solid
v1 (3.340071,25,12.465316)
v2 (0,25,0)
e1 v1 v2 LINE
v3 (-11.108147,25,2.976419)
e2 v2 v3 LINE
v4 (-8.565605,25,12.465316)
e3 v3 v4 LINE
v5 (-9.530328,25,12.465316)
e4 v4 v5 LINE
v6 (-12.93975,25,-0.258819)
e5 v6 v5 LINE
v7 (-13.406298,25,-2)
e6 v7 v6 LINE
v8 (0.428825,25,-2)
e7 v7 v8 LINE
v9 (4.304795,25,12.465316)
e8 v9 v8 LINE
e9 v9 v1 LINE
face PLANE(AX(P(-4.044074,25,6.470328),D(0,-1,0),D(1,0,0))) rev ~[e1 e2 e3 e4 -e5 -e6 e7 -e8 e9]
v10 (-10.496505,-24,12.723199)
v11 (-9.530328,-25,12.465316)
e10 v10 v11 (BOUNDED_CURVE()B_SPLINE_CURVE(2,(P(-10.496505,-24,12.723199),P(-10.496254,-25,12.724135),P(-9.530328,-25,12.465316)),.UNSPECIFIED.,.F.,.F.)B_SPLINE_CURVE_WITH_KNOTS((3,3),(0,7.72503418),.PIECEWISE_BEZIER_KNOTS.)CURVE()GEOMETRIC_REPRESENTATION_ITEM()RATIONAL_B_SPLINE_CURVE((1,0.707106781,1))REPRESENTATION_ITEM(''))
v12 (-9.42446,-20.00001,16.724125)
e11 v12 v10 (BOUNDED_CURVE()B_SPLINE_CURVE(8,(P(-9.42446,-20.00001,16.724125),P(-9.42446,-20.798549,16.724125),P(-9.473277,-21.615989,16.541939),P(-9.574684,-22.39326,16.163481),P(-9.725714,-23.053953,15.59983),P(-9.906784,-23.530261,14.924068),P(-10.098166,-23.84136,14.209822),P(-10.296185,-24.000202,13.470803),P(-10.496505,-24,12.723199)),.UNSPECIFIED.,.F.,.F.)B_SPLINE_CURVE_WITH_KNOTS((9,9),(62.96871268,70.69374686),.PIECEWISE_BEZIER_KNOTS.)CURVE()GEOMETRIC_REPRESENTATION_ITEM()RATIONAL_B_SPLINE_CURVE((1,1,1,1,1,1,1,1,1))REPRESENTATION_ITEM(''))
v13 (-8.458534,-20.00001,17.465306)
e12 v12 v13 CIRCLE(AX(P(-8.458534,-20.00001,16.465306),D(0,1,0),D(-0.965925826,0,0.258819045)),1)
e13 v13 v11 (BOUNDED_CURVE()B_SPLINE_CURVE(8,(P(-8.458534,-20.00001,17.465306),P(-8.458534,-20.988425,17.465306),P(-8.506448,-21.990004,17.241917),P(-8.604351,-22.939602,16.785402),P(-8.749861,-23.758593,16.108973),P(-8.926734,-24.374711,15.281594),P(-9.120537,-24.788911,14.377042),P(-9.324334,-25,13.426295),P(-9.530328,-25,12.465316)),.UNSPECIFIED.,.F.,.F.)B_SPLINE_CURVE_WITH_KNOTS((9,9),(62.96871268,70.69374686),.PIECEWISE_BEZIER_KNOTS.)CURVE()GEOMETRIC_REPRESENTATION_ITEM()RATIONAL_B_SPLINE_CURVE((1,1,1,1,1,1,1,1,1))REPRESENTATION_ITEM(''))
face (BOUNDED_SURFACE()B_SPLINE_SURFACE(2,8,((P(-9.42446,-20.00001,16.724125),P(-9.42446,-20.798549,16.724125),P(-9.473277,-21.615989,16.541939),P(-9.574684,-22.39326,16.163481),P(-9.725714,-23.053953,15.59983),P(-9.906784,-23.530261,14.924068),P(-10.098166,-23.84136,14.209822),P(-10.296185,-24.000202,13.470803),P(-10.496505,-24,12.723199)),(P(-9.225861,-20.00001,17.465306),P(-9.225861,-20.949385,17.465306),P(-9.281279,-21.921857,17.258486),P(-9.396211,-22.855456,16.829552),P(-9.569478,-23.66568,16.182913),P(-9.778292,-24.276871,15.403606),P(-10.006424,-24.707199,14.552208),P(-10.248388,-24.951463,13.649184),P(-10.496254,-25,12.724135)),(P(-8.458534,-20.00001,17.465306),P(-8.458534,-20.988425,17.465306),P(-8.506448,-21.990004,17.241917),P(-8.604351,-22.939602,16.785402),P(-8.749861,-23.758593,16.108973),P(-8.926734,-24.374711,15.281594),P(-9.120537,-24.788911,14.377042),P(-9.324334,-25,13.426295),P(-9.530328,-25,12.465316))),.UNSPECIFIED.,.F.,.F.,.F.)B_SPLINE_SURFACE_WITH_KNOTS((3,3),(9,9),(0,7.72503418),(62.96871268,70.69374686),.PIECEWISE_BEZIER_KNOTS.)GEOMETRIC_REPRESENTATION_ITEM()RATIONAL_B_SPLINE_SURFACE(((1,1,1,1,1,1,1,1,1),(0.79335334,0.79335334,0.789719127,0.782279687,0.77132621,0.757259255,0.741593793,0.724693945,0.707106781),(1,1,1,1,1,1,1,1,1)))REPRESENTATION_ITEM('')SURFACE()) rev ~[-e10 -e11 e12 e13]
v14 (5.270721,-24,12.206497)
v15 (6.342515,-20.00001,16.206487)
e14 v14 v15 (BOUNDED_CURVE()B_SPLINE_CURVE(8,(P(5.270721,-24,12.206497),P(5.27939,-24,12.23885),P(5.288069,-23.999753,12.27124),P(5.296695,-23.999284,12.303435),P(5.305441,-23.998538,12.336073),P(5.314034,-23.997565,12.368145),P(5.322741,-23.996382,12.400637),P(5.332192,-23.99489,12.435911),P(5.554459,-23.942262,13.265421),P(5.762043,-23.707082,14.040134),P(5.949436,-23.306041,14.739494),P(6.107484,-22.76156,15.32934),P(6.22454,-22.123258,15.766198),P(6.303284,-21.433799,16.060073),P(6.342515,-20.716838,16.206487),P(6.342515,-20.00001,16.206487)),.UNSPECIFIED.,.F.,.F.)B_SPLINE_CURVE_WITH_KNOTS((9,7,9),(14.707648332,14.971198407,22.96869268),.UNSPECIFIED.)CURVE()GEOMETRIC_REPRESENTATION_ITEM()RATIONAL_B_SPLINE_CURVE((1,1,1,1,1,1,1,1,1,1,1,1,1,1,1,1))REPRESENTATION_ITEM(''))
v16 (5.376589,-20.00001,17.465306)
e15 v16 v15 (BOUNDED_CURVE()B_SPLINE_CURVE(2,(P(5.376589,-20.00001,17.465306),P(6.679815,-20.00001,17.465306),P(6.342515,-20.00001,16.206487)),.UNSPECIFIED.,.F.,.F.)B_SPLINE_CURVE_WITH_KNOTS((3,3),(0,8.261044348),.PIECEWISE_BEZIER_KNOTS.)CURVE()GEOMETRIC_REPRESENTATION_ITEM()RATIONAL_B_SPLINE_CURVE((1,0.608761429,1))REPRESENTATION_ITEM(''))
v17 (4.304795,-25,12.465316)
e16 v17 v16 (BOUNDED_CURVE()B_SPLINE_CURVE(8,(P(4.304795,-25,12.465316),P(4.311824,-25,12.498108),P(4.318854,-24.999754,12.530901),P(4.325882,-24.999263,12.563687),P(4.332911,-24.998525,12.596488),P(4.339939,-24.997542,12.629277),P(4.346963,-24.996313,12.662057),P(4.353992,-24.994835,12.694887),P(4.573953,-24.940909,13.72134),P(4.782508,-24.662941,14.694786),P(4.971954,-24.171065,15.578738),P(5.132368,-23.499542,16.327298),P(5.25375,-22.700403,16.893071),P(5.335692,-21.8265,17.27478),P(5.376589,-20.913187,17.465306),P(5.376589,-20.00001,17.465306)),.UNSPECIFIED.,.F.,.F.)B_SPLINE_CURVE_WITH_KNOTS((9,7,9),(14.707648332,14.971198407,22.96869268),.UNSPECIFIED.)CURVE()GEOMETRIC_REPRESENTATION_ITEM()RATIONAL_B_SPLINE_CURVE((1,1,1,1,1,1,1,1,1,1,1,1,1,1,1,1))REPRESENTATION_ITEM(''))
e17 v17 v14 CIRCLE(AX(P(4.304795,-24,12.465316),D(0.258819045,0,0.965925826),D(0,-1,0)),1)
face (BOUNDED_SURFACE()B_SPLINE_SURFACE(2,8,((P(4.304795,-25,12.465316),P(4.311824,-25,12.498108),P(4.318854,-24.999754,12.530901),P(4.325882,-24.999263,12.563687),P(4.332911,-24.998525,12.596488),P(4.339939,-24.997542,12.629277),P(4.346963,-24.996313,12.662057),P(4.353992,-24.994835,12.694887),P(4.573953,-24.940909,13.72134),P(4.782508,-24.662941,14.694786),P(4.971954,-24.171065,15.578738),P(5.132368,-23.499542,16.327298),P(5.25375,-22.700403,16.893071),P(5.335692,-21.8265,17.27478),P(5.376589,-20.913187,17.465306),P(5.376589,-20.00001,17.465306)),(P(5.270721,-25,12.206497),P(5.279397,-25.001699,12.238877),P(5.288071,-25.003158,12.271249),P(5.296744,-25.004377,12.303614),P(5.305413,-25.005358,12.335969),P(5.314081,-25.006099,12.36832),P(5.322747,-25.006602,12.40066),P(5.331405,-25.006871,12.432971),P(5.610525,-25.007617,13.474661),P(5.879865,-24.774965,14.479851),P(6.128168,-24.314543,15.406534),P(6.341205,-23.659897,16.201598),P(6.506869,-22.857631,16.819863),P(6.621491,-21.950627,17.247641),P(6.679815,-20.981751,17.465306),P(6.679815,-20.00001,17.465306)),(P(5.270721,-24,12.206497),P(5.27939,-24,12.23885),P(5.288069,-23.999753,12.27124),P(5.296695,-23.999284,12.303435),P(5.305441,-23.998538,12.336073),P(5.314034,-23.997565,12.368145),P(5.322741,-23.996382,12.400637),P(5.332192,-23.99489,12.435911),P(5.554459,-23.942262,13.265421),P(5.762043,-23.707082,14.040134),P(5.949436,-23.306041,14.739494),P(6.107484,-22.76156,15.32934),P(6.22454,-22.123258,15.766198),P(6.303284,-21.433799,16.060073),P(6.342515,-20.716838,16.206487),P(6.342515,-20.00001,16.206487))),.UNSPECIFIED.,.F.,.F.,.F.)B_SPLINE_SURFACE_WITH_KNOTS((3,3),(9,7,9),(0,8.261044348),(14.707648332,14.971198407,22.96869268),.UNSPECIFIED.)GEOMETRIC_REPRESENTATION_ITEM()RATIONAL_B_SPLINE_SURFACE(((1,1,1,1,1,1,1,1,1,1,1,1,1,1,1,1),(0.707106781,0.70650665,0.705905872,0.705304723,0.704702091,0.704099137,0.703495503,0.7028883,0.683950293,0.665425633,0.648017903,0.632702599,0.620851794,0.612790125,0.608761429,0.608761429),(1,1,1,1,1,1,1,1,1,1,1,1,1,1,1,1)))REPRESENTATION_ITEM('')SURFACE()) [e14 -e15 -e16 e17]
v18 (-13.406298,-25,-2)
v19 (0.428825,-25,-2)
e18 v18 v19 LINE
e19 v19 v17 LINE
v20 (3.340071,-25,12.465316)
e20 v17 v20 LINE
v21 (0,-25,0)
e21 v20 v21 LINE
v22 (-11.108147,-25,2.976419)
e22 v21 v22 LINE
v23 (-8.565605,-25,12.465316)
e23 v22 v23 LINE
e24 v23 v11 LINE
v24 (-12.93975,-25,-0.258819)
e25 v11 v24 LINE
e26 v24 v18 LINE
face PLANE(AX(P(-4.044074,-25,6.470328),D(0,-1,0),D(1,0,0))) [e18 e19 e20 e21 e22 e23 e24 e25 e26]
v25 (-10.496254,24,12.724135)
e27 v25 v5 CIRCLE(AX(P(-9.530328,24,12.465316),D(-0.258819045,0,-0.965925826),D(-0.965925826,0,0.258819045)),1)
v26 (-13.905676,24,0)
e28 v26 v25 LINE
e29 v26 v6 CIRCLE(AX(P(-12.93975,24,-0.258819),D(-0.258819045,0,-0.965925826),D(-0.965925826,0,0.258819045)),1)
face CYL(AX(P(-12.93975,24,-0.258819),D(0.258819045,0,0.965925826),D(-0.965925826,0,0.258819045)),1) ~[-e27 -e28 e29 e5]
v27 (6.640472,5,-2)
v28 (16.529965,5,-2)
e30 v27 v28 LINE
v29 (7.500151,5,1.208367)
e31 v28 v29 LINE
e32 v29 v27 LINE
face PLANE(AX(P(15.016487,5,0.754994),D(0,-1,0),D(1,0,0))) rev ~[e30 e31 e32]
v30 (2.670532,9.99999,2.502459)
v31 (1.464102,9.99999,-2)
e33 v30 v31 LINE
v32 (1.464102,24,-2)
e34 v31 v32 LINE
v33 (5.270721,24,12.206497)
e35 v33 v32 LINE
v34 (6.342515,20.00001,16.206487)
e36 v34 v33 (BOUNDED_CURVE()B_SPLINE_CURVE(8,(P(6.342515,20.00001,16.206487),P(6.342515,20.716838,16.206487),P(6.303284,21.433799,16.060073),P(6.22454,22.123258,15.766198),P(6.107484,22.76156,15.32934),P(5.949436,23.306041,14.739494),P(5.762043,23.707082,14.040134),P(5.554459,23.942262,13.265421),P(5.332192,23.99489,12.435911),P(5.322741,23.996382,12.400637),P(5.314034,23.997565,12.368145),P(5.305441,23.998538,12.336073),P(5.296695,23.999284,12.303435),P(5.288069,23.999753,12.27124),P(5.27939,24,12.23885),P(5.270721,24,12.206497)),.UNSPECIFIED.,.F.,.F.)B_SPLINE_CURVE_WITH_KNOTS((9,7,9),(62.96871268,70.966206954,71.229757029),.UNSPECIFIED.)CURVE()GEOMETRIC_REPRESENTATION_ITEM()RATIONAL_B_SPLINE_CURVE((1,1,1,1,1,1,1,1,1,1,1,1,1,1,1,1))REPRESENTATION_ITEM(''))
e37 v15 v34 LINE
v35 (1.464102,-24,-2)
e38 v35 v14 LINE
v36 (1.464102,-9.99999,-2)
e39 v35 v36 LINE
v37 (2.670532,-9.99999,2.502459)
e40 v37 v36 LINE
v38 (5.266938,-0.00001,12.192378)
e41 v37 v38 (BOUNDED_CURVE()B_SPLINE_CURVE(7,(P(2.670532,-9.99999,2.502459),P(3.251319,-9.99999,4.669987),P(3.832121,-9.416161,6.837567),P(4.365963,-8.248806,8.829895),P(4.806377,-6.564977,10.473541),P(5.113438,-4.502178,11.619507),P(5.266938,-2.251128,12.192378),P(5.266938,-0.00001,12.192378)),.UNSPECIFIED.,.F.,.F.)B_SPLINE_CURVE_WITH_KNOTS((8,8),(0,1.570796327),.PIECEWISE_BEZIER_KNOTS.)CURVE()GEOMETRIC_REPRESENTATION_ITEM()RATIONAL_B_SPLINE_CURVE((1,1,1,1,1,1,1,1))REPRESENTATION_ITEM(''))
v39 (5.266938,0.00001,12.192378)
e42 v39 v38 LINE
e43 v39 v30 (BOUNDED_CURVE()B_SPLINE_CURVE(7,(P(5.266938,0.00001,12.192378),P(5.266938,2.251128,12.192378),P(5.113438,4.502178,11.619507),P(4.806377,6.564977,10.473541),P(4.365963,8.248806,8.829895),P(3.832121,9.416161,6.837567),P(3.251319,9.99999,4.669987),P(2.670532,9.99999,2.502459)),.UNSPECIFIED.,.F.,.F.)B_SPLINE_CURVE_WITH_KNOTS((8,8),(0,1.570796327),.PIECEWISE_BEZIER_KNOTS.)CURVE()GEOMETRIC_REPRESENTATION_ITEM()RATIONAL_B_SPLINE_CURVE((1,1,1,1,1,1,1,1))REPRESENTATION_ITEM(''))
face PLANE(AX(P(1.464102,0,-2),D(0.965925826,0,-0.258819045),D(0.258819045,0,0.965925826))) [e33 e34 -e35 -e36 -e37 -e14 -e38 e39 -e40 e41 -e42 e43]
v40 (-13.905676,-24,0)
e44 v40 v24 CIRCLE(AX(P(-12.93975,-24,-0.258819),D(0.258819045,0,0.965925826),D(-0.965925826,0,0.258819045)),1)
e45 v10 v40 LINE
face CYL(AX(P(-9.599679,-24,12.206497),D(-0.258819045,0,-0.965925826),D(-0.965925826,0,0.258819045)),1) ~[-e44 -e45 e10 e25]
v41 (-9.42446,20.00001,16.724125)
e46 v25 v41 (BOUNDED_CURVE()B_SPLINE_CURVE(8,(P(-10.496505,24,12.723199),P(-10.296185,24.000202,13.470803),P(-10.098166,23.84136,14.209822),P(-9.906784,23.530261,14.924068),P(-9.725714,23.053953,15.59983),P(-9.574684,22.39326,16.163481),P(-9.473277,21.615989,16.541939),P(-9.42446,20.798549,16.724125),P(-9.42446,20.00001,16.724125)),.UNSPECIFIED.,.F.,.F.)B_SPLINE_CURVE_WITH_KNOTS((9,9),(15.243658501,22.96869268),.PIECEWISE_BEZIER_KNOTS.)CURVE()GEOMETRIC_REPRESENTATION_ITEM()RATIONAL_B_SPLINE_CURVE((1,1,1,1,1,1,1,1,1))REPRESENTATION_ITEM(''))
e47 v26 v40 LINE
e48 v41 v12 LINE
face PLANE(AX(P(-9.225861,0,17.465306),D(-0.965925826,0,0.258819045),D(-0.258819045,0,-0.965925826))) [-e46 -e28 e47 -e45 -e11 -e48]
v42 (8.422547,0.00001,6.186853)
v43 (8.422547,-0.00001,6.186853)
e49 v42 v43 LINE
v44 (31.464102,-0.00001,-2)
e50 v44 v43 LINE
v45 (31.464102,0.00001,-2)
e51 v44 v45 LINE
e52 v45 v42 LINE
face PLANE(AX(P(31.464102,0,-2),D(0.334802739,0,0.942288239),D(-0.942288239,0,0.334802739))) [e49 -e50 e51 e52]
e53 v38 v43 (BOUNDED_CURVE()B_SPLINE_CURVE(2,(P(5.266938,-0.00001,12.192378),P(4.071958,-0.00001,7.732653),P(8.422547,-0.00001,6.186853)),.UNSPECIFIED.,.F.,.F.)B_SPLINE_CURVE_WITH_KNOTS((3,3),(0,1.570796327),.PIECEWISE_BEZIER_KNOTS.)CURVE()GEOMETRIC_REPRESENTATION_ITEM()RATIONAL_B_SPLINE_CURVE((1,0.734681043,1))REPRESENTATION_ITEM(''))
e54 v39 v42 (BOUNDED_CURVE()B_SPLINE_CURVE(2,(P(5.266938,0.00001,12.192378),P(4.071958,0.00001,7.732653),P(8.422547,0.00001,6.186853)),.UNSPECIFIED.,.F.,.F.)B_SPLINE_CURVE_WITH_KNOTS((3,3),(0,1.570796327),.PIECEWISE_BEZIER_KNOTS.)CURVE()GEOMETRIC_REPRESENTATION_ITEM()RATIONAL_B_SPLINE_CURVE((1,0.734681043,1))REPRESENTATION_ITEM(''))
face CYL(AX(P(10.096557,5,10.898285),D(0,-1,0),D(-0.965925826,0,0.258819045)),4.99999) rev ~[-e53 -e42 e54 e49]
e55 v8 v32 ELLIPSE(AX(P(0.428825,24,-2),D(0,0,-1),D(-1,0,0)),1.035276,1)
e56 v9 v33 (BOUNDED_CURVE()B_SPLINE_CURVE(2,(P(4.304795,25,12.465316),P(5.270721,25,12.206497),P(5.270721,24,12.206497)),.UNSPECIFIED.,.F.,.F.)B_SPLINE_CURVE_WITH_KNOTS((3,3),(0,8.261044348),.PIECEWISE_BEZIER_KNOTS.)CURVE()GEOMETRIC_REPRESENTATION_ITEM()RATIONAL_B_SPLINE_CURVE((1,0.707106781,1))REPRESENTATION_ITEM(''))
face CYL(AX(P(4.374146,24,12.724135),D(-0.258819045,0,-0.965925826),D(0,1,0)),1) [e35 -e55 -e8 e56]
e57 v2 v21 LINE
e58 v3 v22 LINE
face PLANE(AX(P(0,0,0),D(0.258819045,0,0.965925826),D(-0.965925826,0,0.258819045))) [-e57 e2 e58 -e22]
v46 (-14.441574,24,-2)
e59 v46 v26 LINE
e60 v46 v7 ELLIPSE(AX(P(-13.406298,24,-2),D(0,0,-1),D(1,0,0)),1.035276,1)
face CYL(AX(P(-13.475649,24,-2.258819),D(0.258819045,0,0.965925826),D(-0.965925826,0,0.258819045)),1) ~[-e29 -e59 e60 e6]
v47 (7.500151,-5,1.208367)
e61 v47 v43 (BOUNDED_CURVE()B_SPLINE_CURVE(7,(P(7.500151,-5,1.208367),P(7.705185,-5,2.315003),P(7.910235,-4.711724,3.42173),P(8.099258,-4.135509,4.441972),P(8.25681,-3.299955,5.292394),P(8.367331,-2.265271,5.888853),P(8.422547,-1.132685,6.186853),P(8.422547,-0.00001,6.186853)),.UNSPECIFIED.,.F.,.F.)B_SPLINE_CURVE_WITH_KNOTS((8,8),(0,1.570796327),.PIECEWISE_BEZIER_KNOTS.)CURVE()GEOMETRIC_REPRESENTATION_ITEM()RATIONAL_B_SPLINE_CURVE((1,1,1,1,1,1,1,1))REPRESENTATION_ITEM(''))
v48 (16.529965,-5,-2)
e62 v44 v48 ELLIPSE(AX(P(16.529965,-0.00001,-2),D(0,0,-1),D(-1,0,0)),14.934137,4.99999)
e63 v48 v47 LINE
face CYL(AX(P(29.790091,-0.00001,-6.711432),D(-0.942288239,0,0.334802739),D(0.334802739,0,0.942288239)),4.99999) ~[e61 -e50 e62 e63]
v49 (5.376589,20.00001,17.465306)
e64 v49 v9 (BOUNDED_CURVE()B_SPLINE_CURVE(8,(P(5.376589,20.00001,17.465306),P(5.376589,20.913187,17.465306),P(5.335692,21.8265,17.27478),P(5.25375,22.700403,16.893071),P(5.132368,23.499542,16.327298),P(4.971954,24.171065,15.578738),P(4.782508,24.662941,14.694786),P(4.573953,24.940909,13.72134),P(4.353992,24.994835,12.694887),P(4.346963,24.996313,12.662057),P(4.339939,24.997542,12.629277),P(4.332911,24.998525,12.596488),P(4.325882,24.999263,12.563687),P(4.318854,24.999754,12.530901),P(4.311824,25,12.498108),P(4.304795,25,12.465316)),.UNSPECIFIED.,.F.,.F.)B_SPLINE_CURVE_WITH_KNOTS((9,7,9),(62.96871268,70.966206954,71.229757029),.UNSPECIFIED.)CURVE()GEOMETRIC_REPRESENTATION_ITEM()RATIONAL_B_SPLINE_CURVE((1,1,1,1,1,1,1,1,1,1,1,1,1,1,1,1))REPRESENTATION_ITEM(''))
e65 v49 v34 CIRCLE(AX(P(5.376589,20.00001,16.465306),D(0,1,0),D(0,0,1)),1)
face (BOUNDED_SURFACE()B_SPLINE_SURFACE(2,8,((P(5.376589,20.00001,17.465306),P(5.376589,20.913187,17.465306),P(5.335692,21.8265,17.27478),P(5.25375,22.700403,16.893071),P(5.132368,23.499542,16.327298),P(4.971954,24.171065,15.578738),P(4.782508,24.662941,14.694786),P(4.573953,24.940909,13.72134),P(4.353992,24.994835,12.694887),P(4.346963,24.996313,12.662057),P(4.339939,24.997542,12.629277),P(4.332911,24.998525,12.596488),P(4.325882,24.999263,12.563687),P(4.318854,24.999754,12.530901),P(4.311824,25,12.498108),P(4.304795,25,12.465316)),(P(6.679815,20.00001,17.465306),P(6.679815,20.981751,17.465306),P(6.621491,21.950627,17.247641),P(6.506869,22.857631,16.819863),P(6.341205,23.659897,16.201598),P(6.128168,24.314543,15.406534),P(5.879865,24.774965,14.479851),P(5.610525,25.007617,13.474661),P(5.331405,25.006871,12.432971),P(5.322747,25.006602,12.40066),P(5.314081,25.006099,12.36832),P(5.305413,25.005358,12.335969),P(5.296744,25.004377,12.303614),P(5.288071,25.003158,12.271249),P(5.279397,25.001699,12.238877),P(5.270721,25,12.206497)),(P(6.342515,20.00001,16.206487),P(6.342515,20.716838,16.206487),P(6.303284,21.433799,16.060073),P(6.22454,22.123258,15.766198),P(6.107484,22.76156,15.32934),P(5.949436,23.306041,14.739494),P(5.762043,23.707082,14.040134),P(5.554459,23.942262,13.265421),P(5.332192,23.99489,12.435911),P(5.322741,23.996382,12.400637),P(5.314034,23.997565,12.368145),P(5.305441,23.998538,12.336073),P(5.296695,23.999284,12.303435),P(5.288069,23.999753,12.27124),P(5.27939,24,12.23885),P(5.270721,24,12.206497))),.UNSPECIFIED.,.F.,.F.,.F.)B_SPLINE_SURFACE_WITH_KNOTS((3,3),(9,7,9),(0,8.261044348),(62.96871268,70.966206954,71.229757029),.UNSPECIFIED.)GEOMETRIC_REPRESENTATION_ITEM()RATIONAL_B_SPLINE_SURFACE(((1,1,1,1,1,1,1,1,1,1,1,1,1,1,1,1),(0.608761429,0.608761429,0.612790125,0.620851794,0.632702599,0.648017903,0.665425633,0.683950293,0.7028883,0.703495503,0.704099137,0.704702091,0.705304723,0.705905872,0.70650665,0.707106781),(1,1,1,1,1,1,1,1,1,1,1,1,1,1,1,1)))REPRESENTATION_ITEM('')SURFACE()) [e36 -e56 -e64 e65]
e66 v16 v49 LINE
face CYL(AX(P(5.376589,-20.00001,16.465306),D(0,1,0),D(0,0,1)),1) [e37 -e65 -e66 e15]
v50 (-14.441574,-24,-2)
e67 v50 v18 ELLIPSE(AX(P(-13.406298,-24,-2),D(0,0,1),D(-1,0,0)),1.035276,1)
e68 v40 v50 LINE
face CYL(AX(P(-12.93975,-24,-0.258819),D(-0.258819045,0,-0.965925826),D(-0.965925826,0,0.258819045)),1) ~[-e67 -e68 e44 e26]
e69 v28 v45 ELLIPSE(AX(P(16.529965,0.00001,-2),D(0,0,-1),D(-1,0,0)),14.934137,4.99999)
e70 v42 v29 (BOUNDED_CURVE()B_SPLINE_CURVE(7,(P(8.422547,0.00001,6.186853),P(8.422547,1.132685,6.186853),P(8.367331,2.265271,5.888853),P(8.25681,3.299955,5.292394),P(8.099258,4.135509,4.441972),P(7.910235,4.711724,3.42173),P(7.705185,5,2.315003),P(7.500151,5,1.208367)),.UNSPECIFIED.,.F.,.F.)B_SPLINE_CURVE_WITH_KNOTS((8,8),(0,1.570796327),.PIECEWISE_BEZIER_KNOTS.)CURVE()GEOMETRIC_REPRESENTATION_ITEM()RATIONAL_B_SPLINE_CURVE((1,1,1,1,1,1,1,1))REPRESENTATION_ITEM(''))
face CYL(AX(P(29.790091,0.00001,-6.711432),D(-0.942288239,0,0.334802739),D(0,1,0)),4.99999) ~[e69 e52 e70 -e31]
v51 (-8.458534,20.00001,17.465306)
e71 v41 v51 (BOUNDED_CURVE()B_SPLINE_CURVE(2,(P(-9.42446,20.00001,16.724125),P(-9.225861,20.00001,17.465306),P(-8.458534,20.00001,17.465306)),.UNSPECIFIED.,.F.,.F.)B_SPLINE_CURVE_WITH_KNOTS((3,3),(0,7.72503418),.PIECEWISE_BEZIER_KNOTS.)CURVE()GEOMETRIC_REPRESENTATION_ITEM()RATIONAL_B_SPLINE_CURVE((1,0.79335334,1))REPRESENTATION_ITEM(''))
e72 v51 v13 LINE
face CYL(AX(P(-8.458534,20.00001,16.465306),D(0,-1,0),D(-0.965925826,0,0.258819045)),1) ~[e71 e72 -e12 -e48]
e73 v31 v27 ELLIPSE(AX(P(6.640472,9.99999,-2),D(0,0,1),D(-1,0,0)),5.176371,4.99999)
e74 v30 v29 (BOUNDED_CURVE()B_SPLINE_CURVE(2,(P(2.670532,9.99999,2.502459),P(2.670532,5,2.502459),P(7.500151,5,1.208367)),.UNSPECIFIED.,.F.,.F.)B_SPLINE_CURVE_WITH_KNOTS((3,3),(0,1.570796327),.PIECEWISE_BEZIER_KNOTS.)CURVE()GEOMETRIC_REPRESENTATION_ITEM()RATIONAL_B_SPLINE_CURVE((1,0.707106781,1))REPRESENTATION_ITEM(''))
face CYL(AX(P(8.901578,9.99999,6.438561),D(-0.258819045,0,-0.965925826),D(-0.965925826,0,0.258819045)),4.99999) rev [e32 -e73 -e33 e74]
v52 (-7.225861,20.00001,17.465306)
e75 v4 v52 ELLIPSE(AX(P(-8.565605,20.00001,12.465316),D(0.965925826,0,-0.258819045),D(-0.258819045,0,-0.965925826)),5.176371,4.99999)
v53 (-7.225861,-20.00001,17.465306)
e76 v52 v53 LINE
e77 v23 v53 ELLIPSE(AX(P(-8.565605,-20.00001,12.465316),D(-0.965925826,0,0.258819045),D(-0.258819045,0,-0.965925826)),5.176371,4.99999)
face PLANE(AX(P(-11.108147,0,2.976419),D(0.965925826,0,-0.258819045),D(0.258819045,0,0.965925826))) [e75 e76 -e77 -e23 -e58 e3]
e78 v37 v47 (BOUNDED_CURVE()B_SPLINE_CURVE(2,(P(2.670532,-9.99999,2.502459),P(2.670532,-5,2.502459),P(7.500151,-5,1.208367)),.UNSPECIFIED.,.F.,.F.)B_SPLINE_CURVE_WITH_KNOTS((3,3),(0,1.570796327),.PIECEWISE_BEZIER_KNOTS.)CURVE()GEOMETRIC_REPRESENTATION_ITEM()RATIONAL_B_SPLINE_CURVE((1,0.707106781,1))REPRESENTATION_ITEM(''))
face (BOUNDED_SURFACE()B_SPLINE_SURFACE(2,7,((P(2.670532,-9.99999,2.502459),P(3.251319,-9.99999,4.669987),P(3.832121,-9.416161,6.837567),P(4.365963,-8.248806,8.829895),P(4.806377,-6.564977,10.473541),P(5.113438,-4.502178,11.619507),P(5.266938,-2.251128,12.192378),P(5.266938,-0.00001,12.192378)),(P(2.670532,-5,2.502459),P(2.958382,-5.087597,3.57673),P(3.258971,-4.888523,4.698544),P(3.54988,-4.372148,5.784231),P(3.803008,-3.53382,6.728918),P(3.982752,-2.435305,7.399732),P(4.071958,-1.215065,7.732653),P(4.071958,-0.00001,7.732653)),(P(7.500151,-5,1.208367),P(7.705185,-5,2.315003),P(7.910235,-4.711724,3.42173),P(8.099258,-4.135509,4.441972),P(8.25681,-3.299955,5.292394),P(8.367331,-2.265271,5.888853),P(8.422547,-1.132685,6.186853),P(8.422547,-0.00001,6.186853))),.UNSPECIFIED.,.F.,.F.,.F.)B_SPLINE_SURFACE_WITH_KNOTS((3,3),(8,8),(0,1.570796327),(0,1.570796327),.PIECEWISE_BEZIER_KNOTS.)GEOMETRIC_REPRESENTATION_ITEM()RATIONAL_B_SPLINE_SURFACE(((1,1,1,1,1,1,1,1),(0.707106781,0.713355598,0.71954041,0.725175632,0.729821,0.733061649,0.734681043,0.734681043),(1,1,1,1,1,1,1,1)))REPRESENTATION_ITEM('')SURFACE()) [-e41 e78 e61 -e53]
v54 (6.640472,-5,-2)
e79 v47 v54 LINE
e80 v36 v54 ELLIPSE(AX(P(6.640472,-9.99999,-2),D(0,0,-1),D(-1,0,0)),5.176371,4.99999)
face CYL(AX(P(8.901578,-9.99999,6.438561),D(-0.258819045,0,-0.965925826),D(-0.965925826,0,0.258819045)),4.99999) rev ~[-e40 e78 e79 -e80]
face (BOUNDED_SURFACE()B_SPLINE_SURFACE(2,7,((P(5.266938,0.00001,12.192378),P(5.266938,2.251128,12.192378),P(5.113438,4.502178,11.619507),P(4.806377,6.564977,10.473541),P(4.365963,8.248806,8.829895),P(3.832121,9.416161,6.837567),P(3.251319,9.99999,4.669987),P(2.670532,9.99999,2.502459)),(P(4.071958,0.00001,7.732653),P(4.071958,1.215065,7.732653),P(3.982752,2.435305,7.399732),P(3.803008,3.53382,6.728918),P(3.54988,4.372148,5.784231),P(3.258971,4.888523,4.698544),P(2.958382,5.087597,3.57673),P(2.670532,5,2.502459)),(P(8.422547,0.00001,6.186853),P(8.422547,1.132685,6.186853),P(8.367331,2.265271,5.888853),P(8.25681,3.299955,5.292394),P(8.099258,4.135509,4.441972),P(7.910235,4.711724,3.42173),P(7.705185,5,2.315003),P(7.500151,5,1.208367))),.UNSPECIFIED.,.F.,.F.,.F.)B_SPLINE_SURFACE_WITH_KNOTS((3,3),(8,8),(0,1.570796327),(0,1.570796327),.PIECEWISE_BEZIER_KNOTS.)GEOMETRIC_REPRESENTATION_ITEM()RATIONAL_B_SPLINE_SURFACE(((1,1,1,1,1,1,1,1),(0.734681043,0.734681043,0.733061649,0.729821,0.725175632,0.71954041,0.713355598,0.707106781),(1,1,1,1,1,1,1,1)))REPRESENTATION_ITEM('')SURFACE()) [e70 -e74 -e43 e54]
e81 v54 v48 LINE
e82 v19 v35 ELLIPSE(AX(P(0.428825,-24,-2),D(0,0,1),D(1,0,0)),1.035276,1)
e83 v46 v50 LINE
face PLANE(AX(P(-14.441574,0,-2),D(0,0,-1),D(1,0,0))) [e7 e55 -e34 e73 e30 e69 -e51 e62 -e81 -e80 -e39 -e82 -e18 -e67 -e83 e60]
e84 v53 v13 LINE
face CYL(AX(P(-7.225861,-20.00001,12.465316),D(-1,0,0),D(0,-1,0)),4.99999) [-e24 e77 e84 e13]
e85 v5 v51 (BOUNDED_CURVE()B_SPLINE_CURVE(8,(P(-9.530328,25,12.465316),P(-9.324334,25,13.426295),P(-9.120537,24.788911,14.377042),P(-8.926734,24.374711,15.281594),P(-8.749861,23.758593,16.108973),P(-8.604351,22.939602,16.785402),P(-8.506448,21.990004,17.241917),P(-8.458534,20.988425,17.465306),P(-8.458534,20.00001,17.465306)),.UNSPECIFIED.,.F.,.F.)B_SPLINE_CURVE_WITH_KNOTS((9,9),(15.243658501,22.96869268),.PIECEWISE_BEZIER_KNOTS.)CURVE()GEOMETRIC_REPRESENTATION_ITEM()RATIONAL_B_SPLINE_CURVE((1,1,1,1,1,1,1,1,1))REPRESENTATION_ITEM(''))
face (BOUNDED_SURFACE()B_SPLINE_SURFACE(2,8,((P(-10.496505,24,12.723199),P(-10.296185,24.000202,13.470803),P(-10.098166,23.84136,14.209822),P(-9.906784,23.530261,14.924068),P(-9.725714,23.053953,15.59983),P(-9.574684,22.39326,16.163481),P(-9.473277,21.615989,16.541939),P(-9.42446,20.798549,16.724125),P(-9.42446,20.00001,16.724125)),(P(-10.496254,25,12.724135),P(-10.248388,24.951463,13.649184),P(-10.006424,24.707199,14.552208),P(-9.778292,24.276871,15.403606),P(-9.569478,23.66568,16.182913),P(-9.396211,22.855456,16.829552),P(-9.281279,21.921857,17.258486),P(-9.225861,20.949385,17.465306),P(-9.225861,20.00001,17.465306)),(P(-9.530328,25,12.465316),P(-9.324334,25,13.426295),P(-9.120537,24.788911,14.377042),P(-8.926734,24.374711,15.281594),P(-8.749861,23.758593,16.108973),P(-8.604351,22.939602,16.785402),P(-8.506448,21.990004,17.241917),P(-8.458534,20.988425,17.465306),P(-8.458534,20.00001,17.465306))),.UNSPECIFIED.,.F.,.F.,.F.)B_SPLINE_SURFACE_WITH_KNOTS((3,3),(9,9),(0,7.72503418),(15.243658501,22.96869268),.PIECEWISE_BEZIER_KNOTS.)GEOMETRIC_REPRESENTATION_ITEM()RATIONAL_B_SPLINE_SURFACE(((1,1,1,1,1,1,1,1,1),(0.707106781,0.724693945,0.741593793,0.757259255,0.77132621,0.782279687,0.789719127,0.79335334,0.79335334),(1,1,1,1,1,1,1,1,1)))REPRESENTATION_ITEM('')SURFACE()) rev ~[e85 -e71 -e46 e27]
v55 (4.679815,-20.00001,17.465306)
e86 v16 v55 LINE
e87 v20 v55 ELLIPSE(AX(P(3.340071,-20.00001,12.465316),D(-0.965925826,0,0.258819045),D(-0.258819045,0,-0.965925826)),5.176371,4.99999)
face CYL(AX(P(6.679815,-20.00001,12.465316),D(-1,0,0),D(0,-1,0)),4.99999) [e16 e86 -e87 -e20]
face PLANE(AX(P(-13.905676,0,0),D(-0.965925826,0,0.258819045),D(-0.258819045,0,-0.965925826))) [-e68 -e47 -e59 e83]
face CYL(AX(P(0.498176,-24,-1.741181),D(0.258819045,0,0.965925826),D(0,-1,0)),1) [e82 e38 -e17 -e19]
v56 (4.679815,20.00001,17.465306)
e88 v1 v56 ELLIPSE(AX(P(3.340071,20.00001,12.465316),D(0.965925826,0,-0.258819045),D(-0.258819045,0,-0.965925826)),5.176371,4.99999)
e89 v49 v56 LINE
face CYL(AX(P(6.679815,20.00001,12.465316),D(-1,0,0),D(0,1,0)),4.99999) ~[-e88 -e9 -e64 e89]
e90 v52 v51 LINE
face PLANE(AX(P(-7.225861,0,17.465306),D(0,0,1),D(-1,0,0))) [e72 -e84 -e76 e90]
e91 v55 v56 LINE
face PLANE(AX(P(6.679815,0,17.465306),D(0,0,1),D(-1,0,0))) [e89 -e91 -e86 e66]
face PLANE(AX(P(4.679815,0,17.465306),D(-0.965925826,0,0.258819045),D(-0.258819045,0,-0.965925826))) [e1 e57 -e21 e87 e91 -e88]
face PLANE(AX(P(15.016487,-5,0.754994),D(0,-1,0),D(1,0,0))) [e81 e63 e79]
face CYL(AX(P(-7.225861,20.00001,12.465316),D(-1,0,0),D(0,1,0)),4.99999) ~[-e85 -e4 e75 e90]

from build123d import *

# Parameters (mm, degrees)
F1_DEPTH = 25
F2_DEPTH = 5
F3_R     = 4.99999
F4_R     = 1


# Not quite as in the source:
# - a fillet or chamfer is up to 0.001 mm smaller than in the source, because OpenCascade refuses the exact size


with BuildPart() as f1:
    # F0 (on Front) → F1 (new body, symmetric)
    with BuildSketch(Plane.XZ):
        Polygon((4.6798147489, 17.465306413), (0, 0), (-11.1081470023, 2.9764190187), (-7.2258613258, 17.465306413), (-9.2258613258, 17.465306413), (-13.9056760747, 0), (-14.4415744596, -2), (1.4641016151, -2), (4.071958182, 7.7326532065), (6.6798147489, 17.465306413), align=None)
    extrude(amount=F1_DEPTH, both=True)

    # F0 (on Front) → F2 (join, symmetric)
    with BuildSketch(Plane.XZ):
        Polygon((31.4641016151, -2), (4.071958182, 7.7326532065), (1.4641016151, -2), align=None)
    extrude(amount=F2_DEPTH, both=True)

    # F3 (radius 5 in the source; OpenCascade refuses exactly that, so slightly less here)
    f3_edges = [f1.edges().sort_by_distance(p)[0] for p in [
        (2.76803, -5, 2.866327),
        (4.071958, 0, 7.732653),
        (2.76803, 5, 2.866327),
        (17.76803, 5, 2.866327),
        (17.76803, -5, 2.866327),
        (5.679815, -25, 17.465306),
        (-8.225861, -25, 17.465306),
        (-8.225861, 25, 17.465306),
        (5.679815, 25, 17.465306),
    ]]
    fillet(f3_edges, radius=F3_R)

    # F4
    f4_edges = [f1.edges().sort_by_distance(p)[0] for p in [
        (-9.225861, 0, 17.465306),
        (6.679815, 0, 17.465306),
    ]]
    fillet(f4_edges, radius=F4_R)


solid = f1.part
